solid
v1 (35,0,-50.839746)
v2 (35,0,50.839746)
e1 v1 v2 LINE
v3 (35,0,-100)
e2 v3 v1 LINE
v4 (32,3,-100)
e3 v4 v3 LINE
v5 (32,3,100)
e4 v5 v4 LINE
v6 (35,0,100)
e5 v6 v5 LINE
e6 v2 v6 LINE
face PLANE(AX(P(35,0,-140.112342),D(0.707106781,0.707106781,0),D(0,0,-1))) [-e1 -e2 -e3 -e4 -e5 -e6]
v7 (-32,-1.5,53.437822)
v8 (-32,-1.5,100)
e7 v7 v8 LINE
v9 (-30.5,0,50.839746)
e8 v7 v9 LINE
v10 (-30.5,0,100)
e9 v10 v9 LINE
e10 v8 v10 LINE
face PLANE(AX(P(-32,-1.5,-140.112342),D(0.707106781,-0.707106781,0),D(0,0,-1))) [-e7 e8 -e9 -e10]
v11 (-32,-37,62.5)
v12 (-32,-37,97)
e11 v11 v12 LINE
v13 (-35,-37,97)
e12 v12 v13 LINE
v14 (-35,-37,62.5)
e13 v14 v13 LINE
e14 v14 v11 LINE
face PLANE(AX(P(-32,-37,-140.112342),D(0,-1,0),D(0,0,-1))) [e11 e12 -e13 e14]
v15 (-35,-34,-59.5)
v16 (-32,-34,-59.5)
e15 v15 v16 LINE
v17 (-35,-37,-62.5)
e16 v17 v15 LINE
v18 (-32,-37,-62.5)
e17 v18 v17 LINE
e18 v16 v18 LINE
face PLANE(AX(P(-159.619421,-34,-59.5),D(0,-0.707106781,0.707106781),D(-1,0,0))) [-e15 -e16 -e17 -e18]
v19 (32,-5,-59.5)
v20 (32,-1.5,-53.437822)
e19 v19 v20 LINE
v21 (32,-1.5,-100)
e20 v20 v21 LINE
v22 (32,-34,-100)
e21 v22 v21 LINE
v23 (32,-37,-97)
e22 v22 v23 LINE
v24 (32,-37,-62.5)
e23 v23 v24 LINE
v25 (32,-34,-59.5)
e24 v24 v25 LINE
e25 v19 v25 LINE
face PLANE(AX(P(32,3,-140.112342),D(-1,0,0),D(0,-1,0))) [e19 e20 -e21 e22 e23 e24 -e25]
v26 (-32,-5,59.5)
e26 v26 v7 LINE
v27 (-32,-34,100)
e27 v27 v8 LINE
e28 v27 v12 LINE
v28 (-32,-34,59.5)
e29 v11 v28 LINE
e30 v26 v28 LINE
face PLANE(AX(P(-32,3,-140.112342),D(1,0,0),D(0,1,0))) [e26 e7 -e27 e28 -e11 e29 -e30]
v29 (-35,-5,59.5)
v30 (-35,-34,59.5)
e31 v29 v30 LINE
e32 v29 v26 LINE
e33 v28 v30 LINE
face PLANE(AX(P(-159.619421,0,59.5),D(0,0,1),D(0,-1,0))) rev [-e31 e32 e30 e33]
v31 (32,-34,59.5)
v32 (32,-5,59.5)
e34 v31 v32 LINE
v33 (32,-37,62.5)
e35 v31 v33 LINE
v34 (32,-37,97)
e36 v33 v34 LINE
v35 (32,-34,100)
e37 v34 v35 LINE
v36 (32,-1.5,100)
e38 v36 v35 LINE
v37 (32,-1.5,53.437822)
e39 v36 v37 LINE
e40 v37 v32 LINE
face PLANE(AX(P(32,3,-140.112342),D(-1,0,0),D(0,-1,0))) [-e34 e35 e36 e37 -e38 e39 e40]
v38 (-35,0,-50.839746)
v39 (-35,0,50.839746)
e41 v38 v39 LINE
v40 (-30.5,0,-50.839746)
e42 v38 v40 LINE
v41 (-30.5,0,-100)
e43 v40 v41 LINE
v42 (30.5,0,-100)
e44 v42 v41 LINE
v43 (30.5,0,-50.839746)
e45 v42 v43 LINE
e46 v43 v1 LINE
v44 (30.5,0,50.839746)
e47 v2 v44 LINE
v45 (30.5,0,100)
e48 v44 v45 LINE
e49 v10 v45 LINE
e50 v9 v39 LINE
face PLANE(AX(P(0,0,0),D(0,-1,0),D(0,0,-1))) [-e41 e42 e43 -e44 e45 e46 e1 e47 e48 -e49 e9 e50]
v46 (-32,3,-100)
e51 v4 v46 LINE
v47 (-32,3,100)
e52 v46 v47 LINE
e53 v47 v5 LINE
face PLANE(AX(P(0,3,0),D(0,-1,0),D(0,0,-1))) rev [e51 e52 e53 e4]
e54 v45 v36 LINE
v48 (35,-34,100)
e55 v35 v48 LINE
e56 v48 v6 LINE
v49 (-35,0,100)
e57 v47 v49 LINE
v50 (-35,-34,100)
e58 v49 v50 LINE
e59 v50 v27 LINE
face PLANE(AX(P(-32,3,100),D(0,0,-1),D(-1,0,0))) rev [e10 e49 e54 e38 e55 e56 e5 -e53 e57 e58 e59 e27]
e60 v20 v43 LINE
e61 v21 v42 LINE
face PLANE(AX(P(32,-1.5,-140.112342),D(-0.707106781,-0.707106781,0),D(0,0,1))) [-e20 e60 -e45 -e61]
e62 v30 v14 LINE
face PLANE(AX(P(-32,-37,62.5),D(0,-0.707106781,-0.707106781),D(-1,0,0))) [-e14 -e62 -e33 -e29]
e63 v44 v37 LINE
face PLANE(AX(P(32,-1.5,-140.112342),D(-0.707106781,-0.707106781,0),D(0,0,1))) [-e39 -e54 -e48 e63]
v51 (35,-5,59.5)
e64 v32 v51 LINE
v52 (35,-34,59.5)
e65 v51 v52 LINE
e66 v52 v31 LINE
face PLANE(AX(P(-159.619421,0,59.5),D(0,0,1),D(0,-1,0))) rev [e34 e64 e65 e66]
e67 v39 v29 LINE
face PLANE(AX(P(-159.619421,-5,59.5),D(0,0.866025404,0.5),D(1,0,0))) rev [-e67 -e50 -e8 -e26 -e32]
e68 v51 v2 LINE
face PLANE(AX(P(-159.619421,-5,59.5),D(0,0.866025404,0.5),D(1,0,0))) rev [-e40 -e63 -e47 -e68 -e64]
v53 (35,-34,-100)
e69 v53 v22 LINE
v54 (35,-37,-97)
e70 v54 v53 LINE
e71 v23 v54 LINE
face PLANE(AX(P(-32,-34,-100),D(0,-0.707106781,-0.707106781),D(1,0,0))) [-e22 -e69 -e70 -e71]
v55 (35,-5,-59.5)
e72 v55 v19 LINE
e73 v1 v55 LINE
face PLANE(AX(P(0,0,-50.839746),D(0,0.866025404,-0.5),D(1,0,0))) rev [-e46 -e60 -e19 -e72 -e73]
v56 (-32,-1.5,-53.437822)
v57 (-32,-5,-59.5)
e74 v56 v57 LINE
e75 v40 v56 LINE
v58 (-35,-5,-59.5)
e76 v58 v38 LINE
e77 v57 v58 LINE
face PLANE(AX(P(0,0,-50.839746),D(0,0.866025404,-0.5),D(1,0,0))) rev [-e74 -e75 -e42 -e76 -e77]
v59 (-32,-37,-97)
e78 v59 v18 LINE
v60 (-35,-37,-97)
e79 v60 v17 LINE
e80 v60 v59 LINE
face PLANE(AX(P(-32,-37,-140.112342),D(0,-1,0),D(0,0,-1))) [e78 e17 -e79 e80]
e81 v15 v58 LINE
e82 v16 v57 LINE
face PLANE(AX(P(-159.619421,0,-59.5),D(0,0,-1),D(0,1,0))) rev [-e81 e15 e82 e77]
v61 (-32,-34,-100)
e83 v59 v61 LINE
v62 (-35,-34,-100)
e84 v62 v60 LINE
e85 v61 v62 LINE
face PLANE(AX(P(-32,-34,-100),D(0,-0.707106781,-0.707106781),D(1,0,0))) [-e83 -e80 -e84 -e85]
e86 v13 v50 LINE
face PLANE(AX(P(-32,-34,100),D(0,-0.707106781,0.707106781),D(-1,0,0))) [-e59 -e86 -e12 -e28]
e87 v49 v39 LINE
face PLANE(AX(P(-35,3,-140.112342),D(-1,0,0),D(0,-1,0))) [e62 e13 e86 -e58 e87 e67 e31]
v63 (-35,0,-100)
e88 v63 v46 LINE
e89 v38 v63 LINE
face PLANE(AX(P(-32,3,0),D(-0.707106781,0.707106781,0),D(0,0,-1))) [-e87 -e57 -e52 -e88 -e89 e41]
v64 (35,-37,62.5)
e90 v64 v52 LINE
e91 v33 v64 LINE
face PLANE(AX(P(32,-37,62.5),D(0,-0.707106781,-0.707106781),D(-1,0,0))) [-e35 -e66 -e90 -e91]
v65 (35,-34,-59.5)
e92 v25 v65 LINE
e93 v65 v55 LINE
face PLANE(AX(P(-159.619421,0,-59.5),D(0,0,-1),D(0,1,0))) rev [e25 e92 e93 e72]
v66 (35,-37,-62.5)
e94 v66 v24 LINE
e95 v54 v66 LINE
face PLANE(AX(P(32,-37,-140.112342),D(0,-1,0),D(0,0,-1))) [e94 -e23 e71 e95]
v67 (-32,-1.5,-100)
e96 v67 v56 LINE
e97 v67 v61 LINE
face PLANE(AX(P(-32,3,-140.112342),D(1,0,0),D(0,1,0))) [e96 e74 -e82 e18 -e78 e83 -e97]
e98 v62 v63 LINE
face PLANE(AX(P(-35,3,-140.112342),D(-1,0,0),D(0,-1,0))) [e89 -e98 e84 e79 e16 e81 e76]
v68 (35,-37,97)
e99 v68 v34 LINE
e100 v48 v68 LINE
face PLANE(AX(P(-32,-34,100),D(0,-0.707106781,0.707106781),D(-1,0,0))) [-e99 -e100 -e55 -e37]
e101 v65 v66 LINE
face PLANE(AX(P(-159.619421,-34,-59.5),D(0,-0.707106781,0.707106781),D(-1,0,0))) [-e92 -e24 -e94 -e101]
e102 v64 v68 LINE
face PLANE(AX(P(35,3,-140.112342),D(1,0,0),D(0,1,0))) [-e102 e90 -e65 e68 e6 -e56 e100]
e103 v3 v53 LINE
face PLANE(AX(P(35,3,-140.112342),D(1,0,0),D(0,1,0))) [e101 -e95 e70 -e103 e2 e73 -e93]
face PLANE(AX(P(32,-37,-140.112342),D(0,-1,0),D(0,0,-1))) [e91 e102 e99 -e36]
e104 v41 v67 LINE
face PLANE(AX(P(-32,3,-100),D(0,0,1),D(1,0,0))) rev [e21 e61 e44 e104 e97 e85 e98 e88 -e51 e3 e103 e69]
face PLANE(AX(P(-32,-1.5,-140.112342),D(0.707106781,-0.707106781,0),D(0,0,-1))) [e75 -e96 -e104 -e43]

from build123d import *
from OCP.BRepFilletAPI import BRepFilletAPI_MakeChamfer

# Parameters (mm, degrees)
SKETCH2_W           = 64
SKETCH2_H           = 200
BOSS_EXTRUDE1_DEPTH = 3
SKETCH13_W          = 3
SKETCH13_H          = 40
BOSS_EXTRUDE2_DEPTH = 200
CHAMFER1_SIZE       = 1.5
CHAMFER2_SIZE       = 3
CUT_EXTRUDE1_REACH  = 129.55
SKETCH14_W          = 119
SKETCH14_H          = 37
CHAMFER3_SIZE       = 8.660254038
CHAMFER3_SIZE_2     = 5
CHAMFER4_SIZE       = 3


with BuildPart() as part:
    # Sketch2 → Boss-Extrude1 (new body)
    with BuildSketch(Plane(origin=(0, 0, 0), x_dir=(1, 0, 0), z_dir=(0, 1, 0))):
        Rectangle(SKETCH2_W, SKETCH2_H)
    extrude(amount=BOSS_EXTRUDE1_DEPTH)

    # Sketch13 → Boss-Extrude2 (add)
    with BuildSketch(Plane.XY.offset(100)):
        with Locations((33.5, -17)):
            Rectangle(SKETCH13_W, SKETCH13_H)
        with Locations((-33.5, -17)):
            Rectangle(SKETCH13_W, SKETCH13_H)
    extrude(amount=-BOSS_EXTRUDE2_DEPTH)

    # Chamfer1
    chamfer1_edges = [part.edges().sort_by_distance(p)[0] for p in [
        (-32, 0, 0),
        (32, 0, 0),
    ]]
    chamfer(chamfer1_edges, length=CHAMFER1_SIZE)

    # Chamfer2
    chamfer2_edges = [part.edges().sort_by_distance(p)[0] for p in [
        (35, 3, 0),
        (-35, 3, 0),
    ]]
    chamfer(chamfer2_edges, length=CHAMFER2_SIZE)

    # Cut-Extrude1: up to this face of the body (flat: up to its plane)
    cut_extrude1_end = Plane(part.part.faces().sort_by_distance((-35, -18.5, 0))[0])
    # Sketch14 → Cut-Extrude1 (cut, up to the picked face)
    with BuildSketch(Plane(origin=(35, 0, 0), x_dir=(0, 0, -1), z_dir=(1, 0, 0)), mode=Mode.PRIVATE) as cut_extrude1_sk1:
        with Locations((0, -18.5)):
            Rectangle(SKETCH14_W, SKETCH14_H)
    cut_extrude1_tool1 = split(extrude(cut_extrude1_sk1.sketch, amount=-CUT_EXTRUDE1_REACH, mode=Mode.PRIVATE), bisect_by=cut_extrude1_end, keep=Keep.BOTH, mode=Mode.PRIVATE)
    add(cut_extrude1_tool1.solids().sort_by(Axis((35, -18.5, 0), (-1, 0, 0)))[0], mode=Mode.SUBTRACT)

    # Chamfer3
    chamfer3_edges_1 = [part.edges().sort_by_distance(p)[0] for p in [
        (32.75, 0, -59.5),
    ]]
    chamfer3_side_1 = [part.faces().sort_by_distance(p)[0] for p in [
        (32.75, 0, -59.4),
    ]]
    chamfer3_edges_2 = [part.edges().sort_by_distance(p)[0] for p in [
        (-32.75, 0, -59.5),
    ]]
    chamfer3_side_2 = [part.faces().sort_by_distance(p)[0] for p in [
        (-32.75, 0, -59.4),
    ]]
    chamfer3_edges_3 = [part.edges().sort_by_distance(p)[0] for p in [
        (32.75, 0, 59.5),
    ]]
    chamfer3_side_3 = [part.faces().sort_by_distance(p)[0] for p in [
        (32.75, 0, 59.4),
    ]]
    chamfer3_edges_4 = [part.edges().sort_by_distance(p)[0] for p in [
        (-32.75, 0, 59.5),
    ]]
    chamfer3_side_4 = [part.faces().sort_by_distance(p)[0] for p in [
        (-32.75, 0, 59.4),
    ]]
    chamfer3 = BRepFilletAPI_MakeChamfer(part.part.solid().wrapped)
    for e in chamfer3_edges_1:
        chamfer3.Add(CHAMFER3_SIZE - 0.0001, CHAMFER3_SIZE_2 - 0.0001, e.wrapped, chamfer3_side_1[0].wrapped)
    for e in chamfer3_edges_2:
        chamfer3.Add(CHAMFER3_SIZE - 0.0001, CHAMFER3_SIZE_2 - 0.0001, e.wrapped, chamfer3_side_2[0].wrapped)
    for e in chamfer3_edges_3:
        chamfer3.Add(CHAMFER3_SIZE - 0.0001, CHAMFER3_SIZE_2 - 0.0001, e.wrapped, chamfer3_side_3[0].wrapped)
    for e in chamfer3_edges_4:
        chamfer3.Add(CHAMFER3_SIZE - 0.0001, CHAMFER3_SIZE_2 - 0.0001, e.wrapped, chamfer3_side_4[0].wrapped)
    add(Compound.cast(chamfer3.Shape()), mode=Mode.REPLACE)  # a hair under: the kernel refuses the full size

    # Chamfer4
    chamfer4_edges = [part.edges().sort_by_distance(p)[0] for p in [
        (33.5, -37, 100),
        (33.5, -37, -100),
        (-33.5, -37, 100),
        (-33.5, -37, -100),
        (33.5, -37, -59.5),
        (-33.5, -37, 59.5),
        (-33.5, -37, -59.5),
        (33.5, -37, 59.5),
    ]]
    chamfer(chamfer4_edges, length=CHAMFER4_SIZE)


solid = part.part
